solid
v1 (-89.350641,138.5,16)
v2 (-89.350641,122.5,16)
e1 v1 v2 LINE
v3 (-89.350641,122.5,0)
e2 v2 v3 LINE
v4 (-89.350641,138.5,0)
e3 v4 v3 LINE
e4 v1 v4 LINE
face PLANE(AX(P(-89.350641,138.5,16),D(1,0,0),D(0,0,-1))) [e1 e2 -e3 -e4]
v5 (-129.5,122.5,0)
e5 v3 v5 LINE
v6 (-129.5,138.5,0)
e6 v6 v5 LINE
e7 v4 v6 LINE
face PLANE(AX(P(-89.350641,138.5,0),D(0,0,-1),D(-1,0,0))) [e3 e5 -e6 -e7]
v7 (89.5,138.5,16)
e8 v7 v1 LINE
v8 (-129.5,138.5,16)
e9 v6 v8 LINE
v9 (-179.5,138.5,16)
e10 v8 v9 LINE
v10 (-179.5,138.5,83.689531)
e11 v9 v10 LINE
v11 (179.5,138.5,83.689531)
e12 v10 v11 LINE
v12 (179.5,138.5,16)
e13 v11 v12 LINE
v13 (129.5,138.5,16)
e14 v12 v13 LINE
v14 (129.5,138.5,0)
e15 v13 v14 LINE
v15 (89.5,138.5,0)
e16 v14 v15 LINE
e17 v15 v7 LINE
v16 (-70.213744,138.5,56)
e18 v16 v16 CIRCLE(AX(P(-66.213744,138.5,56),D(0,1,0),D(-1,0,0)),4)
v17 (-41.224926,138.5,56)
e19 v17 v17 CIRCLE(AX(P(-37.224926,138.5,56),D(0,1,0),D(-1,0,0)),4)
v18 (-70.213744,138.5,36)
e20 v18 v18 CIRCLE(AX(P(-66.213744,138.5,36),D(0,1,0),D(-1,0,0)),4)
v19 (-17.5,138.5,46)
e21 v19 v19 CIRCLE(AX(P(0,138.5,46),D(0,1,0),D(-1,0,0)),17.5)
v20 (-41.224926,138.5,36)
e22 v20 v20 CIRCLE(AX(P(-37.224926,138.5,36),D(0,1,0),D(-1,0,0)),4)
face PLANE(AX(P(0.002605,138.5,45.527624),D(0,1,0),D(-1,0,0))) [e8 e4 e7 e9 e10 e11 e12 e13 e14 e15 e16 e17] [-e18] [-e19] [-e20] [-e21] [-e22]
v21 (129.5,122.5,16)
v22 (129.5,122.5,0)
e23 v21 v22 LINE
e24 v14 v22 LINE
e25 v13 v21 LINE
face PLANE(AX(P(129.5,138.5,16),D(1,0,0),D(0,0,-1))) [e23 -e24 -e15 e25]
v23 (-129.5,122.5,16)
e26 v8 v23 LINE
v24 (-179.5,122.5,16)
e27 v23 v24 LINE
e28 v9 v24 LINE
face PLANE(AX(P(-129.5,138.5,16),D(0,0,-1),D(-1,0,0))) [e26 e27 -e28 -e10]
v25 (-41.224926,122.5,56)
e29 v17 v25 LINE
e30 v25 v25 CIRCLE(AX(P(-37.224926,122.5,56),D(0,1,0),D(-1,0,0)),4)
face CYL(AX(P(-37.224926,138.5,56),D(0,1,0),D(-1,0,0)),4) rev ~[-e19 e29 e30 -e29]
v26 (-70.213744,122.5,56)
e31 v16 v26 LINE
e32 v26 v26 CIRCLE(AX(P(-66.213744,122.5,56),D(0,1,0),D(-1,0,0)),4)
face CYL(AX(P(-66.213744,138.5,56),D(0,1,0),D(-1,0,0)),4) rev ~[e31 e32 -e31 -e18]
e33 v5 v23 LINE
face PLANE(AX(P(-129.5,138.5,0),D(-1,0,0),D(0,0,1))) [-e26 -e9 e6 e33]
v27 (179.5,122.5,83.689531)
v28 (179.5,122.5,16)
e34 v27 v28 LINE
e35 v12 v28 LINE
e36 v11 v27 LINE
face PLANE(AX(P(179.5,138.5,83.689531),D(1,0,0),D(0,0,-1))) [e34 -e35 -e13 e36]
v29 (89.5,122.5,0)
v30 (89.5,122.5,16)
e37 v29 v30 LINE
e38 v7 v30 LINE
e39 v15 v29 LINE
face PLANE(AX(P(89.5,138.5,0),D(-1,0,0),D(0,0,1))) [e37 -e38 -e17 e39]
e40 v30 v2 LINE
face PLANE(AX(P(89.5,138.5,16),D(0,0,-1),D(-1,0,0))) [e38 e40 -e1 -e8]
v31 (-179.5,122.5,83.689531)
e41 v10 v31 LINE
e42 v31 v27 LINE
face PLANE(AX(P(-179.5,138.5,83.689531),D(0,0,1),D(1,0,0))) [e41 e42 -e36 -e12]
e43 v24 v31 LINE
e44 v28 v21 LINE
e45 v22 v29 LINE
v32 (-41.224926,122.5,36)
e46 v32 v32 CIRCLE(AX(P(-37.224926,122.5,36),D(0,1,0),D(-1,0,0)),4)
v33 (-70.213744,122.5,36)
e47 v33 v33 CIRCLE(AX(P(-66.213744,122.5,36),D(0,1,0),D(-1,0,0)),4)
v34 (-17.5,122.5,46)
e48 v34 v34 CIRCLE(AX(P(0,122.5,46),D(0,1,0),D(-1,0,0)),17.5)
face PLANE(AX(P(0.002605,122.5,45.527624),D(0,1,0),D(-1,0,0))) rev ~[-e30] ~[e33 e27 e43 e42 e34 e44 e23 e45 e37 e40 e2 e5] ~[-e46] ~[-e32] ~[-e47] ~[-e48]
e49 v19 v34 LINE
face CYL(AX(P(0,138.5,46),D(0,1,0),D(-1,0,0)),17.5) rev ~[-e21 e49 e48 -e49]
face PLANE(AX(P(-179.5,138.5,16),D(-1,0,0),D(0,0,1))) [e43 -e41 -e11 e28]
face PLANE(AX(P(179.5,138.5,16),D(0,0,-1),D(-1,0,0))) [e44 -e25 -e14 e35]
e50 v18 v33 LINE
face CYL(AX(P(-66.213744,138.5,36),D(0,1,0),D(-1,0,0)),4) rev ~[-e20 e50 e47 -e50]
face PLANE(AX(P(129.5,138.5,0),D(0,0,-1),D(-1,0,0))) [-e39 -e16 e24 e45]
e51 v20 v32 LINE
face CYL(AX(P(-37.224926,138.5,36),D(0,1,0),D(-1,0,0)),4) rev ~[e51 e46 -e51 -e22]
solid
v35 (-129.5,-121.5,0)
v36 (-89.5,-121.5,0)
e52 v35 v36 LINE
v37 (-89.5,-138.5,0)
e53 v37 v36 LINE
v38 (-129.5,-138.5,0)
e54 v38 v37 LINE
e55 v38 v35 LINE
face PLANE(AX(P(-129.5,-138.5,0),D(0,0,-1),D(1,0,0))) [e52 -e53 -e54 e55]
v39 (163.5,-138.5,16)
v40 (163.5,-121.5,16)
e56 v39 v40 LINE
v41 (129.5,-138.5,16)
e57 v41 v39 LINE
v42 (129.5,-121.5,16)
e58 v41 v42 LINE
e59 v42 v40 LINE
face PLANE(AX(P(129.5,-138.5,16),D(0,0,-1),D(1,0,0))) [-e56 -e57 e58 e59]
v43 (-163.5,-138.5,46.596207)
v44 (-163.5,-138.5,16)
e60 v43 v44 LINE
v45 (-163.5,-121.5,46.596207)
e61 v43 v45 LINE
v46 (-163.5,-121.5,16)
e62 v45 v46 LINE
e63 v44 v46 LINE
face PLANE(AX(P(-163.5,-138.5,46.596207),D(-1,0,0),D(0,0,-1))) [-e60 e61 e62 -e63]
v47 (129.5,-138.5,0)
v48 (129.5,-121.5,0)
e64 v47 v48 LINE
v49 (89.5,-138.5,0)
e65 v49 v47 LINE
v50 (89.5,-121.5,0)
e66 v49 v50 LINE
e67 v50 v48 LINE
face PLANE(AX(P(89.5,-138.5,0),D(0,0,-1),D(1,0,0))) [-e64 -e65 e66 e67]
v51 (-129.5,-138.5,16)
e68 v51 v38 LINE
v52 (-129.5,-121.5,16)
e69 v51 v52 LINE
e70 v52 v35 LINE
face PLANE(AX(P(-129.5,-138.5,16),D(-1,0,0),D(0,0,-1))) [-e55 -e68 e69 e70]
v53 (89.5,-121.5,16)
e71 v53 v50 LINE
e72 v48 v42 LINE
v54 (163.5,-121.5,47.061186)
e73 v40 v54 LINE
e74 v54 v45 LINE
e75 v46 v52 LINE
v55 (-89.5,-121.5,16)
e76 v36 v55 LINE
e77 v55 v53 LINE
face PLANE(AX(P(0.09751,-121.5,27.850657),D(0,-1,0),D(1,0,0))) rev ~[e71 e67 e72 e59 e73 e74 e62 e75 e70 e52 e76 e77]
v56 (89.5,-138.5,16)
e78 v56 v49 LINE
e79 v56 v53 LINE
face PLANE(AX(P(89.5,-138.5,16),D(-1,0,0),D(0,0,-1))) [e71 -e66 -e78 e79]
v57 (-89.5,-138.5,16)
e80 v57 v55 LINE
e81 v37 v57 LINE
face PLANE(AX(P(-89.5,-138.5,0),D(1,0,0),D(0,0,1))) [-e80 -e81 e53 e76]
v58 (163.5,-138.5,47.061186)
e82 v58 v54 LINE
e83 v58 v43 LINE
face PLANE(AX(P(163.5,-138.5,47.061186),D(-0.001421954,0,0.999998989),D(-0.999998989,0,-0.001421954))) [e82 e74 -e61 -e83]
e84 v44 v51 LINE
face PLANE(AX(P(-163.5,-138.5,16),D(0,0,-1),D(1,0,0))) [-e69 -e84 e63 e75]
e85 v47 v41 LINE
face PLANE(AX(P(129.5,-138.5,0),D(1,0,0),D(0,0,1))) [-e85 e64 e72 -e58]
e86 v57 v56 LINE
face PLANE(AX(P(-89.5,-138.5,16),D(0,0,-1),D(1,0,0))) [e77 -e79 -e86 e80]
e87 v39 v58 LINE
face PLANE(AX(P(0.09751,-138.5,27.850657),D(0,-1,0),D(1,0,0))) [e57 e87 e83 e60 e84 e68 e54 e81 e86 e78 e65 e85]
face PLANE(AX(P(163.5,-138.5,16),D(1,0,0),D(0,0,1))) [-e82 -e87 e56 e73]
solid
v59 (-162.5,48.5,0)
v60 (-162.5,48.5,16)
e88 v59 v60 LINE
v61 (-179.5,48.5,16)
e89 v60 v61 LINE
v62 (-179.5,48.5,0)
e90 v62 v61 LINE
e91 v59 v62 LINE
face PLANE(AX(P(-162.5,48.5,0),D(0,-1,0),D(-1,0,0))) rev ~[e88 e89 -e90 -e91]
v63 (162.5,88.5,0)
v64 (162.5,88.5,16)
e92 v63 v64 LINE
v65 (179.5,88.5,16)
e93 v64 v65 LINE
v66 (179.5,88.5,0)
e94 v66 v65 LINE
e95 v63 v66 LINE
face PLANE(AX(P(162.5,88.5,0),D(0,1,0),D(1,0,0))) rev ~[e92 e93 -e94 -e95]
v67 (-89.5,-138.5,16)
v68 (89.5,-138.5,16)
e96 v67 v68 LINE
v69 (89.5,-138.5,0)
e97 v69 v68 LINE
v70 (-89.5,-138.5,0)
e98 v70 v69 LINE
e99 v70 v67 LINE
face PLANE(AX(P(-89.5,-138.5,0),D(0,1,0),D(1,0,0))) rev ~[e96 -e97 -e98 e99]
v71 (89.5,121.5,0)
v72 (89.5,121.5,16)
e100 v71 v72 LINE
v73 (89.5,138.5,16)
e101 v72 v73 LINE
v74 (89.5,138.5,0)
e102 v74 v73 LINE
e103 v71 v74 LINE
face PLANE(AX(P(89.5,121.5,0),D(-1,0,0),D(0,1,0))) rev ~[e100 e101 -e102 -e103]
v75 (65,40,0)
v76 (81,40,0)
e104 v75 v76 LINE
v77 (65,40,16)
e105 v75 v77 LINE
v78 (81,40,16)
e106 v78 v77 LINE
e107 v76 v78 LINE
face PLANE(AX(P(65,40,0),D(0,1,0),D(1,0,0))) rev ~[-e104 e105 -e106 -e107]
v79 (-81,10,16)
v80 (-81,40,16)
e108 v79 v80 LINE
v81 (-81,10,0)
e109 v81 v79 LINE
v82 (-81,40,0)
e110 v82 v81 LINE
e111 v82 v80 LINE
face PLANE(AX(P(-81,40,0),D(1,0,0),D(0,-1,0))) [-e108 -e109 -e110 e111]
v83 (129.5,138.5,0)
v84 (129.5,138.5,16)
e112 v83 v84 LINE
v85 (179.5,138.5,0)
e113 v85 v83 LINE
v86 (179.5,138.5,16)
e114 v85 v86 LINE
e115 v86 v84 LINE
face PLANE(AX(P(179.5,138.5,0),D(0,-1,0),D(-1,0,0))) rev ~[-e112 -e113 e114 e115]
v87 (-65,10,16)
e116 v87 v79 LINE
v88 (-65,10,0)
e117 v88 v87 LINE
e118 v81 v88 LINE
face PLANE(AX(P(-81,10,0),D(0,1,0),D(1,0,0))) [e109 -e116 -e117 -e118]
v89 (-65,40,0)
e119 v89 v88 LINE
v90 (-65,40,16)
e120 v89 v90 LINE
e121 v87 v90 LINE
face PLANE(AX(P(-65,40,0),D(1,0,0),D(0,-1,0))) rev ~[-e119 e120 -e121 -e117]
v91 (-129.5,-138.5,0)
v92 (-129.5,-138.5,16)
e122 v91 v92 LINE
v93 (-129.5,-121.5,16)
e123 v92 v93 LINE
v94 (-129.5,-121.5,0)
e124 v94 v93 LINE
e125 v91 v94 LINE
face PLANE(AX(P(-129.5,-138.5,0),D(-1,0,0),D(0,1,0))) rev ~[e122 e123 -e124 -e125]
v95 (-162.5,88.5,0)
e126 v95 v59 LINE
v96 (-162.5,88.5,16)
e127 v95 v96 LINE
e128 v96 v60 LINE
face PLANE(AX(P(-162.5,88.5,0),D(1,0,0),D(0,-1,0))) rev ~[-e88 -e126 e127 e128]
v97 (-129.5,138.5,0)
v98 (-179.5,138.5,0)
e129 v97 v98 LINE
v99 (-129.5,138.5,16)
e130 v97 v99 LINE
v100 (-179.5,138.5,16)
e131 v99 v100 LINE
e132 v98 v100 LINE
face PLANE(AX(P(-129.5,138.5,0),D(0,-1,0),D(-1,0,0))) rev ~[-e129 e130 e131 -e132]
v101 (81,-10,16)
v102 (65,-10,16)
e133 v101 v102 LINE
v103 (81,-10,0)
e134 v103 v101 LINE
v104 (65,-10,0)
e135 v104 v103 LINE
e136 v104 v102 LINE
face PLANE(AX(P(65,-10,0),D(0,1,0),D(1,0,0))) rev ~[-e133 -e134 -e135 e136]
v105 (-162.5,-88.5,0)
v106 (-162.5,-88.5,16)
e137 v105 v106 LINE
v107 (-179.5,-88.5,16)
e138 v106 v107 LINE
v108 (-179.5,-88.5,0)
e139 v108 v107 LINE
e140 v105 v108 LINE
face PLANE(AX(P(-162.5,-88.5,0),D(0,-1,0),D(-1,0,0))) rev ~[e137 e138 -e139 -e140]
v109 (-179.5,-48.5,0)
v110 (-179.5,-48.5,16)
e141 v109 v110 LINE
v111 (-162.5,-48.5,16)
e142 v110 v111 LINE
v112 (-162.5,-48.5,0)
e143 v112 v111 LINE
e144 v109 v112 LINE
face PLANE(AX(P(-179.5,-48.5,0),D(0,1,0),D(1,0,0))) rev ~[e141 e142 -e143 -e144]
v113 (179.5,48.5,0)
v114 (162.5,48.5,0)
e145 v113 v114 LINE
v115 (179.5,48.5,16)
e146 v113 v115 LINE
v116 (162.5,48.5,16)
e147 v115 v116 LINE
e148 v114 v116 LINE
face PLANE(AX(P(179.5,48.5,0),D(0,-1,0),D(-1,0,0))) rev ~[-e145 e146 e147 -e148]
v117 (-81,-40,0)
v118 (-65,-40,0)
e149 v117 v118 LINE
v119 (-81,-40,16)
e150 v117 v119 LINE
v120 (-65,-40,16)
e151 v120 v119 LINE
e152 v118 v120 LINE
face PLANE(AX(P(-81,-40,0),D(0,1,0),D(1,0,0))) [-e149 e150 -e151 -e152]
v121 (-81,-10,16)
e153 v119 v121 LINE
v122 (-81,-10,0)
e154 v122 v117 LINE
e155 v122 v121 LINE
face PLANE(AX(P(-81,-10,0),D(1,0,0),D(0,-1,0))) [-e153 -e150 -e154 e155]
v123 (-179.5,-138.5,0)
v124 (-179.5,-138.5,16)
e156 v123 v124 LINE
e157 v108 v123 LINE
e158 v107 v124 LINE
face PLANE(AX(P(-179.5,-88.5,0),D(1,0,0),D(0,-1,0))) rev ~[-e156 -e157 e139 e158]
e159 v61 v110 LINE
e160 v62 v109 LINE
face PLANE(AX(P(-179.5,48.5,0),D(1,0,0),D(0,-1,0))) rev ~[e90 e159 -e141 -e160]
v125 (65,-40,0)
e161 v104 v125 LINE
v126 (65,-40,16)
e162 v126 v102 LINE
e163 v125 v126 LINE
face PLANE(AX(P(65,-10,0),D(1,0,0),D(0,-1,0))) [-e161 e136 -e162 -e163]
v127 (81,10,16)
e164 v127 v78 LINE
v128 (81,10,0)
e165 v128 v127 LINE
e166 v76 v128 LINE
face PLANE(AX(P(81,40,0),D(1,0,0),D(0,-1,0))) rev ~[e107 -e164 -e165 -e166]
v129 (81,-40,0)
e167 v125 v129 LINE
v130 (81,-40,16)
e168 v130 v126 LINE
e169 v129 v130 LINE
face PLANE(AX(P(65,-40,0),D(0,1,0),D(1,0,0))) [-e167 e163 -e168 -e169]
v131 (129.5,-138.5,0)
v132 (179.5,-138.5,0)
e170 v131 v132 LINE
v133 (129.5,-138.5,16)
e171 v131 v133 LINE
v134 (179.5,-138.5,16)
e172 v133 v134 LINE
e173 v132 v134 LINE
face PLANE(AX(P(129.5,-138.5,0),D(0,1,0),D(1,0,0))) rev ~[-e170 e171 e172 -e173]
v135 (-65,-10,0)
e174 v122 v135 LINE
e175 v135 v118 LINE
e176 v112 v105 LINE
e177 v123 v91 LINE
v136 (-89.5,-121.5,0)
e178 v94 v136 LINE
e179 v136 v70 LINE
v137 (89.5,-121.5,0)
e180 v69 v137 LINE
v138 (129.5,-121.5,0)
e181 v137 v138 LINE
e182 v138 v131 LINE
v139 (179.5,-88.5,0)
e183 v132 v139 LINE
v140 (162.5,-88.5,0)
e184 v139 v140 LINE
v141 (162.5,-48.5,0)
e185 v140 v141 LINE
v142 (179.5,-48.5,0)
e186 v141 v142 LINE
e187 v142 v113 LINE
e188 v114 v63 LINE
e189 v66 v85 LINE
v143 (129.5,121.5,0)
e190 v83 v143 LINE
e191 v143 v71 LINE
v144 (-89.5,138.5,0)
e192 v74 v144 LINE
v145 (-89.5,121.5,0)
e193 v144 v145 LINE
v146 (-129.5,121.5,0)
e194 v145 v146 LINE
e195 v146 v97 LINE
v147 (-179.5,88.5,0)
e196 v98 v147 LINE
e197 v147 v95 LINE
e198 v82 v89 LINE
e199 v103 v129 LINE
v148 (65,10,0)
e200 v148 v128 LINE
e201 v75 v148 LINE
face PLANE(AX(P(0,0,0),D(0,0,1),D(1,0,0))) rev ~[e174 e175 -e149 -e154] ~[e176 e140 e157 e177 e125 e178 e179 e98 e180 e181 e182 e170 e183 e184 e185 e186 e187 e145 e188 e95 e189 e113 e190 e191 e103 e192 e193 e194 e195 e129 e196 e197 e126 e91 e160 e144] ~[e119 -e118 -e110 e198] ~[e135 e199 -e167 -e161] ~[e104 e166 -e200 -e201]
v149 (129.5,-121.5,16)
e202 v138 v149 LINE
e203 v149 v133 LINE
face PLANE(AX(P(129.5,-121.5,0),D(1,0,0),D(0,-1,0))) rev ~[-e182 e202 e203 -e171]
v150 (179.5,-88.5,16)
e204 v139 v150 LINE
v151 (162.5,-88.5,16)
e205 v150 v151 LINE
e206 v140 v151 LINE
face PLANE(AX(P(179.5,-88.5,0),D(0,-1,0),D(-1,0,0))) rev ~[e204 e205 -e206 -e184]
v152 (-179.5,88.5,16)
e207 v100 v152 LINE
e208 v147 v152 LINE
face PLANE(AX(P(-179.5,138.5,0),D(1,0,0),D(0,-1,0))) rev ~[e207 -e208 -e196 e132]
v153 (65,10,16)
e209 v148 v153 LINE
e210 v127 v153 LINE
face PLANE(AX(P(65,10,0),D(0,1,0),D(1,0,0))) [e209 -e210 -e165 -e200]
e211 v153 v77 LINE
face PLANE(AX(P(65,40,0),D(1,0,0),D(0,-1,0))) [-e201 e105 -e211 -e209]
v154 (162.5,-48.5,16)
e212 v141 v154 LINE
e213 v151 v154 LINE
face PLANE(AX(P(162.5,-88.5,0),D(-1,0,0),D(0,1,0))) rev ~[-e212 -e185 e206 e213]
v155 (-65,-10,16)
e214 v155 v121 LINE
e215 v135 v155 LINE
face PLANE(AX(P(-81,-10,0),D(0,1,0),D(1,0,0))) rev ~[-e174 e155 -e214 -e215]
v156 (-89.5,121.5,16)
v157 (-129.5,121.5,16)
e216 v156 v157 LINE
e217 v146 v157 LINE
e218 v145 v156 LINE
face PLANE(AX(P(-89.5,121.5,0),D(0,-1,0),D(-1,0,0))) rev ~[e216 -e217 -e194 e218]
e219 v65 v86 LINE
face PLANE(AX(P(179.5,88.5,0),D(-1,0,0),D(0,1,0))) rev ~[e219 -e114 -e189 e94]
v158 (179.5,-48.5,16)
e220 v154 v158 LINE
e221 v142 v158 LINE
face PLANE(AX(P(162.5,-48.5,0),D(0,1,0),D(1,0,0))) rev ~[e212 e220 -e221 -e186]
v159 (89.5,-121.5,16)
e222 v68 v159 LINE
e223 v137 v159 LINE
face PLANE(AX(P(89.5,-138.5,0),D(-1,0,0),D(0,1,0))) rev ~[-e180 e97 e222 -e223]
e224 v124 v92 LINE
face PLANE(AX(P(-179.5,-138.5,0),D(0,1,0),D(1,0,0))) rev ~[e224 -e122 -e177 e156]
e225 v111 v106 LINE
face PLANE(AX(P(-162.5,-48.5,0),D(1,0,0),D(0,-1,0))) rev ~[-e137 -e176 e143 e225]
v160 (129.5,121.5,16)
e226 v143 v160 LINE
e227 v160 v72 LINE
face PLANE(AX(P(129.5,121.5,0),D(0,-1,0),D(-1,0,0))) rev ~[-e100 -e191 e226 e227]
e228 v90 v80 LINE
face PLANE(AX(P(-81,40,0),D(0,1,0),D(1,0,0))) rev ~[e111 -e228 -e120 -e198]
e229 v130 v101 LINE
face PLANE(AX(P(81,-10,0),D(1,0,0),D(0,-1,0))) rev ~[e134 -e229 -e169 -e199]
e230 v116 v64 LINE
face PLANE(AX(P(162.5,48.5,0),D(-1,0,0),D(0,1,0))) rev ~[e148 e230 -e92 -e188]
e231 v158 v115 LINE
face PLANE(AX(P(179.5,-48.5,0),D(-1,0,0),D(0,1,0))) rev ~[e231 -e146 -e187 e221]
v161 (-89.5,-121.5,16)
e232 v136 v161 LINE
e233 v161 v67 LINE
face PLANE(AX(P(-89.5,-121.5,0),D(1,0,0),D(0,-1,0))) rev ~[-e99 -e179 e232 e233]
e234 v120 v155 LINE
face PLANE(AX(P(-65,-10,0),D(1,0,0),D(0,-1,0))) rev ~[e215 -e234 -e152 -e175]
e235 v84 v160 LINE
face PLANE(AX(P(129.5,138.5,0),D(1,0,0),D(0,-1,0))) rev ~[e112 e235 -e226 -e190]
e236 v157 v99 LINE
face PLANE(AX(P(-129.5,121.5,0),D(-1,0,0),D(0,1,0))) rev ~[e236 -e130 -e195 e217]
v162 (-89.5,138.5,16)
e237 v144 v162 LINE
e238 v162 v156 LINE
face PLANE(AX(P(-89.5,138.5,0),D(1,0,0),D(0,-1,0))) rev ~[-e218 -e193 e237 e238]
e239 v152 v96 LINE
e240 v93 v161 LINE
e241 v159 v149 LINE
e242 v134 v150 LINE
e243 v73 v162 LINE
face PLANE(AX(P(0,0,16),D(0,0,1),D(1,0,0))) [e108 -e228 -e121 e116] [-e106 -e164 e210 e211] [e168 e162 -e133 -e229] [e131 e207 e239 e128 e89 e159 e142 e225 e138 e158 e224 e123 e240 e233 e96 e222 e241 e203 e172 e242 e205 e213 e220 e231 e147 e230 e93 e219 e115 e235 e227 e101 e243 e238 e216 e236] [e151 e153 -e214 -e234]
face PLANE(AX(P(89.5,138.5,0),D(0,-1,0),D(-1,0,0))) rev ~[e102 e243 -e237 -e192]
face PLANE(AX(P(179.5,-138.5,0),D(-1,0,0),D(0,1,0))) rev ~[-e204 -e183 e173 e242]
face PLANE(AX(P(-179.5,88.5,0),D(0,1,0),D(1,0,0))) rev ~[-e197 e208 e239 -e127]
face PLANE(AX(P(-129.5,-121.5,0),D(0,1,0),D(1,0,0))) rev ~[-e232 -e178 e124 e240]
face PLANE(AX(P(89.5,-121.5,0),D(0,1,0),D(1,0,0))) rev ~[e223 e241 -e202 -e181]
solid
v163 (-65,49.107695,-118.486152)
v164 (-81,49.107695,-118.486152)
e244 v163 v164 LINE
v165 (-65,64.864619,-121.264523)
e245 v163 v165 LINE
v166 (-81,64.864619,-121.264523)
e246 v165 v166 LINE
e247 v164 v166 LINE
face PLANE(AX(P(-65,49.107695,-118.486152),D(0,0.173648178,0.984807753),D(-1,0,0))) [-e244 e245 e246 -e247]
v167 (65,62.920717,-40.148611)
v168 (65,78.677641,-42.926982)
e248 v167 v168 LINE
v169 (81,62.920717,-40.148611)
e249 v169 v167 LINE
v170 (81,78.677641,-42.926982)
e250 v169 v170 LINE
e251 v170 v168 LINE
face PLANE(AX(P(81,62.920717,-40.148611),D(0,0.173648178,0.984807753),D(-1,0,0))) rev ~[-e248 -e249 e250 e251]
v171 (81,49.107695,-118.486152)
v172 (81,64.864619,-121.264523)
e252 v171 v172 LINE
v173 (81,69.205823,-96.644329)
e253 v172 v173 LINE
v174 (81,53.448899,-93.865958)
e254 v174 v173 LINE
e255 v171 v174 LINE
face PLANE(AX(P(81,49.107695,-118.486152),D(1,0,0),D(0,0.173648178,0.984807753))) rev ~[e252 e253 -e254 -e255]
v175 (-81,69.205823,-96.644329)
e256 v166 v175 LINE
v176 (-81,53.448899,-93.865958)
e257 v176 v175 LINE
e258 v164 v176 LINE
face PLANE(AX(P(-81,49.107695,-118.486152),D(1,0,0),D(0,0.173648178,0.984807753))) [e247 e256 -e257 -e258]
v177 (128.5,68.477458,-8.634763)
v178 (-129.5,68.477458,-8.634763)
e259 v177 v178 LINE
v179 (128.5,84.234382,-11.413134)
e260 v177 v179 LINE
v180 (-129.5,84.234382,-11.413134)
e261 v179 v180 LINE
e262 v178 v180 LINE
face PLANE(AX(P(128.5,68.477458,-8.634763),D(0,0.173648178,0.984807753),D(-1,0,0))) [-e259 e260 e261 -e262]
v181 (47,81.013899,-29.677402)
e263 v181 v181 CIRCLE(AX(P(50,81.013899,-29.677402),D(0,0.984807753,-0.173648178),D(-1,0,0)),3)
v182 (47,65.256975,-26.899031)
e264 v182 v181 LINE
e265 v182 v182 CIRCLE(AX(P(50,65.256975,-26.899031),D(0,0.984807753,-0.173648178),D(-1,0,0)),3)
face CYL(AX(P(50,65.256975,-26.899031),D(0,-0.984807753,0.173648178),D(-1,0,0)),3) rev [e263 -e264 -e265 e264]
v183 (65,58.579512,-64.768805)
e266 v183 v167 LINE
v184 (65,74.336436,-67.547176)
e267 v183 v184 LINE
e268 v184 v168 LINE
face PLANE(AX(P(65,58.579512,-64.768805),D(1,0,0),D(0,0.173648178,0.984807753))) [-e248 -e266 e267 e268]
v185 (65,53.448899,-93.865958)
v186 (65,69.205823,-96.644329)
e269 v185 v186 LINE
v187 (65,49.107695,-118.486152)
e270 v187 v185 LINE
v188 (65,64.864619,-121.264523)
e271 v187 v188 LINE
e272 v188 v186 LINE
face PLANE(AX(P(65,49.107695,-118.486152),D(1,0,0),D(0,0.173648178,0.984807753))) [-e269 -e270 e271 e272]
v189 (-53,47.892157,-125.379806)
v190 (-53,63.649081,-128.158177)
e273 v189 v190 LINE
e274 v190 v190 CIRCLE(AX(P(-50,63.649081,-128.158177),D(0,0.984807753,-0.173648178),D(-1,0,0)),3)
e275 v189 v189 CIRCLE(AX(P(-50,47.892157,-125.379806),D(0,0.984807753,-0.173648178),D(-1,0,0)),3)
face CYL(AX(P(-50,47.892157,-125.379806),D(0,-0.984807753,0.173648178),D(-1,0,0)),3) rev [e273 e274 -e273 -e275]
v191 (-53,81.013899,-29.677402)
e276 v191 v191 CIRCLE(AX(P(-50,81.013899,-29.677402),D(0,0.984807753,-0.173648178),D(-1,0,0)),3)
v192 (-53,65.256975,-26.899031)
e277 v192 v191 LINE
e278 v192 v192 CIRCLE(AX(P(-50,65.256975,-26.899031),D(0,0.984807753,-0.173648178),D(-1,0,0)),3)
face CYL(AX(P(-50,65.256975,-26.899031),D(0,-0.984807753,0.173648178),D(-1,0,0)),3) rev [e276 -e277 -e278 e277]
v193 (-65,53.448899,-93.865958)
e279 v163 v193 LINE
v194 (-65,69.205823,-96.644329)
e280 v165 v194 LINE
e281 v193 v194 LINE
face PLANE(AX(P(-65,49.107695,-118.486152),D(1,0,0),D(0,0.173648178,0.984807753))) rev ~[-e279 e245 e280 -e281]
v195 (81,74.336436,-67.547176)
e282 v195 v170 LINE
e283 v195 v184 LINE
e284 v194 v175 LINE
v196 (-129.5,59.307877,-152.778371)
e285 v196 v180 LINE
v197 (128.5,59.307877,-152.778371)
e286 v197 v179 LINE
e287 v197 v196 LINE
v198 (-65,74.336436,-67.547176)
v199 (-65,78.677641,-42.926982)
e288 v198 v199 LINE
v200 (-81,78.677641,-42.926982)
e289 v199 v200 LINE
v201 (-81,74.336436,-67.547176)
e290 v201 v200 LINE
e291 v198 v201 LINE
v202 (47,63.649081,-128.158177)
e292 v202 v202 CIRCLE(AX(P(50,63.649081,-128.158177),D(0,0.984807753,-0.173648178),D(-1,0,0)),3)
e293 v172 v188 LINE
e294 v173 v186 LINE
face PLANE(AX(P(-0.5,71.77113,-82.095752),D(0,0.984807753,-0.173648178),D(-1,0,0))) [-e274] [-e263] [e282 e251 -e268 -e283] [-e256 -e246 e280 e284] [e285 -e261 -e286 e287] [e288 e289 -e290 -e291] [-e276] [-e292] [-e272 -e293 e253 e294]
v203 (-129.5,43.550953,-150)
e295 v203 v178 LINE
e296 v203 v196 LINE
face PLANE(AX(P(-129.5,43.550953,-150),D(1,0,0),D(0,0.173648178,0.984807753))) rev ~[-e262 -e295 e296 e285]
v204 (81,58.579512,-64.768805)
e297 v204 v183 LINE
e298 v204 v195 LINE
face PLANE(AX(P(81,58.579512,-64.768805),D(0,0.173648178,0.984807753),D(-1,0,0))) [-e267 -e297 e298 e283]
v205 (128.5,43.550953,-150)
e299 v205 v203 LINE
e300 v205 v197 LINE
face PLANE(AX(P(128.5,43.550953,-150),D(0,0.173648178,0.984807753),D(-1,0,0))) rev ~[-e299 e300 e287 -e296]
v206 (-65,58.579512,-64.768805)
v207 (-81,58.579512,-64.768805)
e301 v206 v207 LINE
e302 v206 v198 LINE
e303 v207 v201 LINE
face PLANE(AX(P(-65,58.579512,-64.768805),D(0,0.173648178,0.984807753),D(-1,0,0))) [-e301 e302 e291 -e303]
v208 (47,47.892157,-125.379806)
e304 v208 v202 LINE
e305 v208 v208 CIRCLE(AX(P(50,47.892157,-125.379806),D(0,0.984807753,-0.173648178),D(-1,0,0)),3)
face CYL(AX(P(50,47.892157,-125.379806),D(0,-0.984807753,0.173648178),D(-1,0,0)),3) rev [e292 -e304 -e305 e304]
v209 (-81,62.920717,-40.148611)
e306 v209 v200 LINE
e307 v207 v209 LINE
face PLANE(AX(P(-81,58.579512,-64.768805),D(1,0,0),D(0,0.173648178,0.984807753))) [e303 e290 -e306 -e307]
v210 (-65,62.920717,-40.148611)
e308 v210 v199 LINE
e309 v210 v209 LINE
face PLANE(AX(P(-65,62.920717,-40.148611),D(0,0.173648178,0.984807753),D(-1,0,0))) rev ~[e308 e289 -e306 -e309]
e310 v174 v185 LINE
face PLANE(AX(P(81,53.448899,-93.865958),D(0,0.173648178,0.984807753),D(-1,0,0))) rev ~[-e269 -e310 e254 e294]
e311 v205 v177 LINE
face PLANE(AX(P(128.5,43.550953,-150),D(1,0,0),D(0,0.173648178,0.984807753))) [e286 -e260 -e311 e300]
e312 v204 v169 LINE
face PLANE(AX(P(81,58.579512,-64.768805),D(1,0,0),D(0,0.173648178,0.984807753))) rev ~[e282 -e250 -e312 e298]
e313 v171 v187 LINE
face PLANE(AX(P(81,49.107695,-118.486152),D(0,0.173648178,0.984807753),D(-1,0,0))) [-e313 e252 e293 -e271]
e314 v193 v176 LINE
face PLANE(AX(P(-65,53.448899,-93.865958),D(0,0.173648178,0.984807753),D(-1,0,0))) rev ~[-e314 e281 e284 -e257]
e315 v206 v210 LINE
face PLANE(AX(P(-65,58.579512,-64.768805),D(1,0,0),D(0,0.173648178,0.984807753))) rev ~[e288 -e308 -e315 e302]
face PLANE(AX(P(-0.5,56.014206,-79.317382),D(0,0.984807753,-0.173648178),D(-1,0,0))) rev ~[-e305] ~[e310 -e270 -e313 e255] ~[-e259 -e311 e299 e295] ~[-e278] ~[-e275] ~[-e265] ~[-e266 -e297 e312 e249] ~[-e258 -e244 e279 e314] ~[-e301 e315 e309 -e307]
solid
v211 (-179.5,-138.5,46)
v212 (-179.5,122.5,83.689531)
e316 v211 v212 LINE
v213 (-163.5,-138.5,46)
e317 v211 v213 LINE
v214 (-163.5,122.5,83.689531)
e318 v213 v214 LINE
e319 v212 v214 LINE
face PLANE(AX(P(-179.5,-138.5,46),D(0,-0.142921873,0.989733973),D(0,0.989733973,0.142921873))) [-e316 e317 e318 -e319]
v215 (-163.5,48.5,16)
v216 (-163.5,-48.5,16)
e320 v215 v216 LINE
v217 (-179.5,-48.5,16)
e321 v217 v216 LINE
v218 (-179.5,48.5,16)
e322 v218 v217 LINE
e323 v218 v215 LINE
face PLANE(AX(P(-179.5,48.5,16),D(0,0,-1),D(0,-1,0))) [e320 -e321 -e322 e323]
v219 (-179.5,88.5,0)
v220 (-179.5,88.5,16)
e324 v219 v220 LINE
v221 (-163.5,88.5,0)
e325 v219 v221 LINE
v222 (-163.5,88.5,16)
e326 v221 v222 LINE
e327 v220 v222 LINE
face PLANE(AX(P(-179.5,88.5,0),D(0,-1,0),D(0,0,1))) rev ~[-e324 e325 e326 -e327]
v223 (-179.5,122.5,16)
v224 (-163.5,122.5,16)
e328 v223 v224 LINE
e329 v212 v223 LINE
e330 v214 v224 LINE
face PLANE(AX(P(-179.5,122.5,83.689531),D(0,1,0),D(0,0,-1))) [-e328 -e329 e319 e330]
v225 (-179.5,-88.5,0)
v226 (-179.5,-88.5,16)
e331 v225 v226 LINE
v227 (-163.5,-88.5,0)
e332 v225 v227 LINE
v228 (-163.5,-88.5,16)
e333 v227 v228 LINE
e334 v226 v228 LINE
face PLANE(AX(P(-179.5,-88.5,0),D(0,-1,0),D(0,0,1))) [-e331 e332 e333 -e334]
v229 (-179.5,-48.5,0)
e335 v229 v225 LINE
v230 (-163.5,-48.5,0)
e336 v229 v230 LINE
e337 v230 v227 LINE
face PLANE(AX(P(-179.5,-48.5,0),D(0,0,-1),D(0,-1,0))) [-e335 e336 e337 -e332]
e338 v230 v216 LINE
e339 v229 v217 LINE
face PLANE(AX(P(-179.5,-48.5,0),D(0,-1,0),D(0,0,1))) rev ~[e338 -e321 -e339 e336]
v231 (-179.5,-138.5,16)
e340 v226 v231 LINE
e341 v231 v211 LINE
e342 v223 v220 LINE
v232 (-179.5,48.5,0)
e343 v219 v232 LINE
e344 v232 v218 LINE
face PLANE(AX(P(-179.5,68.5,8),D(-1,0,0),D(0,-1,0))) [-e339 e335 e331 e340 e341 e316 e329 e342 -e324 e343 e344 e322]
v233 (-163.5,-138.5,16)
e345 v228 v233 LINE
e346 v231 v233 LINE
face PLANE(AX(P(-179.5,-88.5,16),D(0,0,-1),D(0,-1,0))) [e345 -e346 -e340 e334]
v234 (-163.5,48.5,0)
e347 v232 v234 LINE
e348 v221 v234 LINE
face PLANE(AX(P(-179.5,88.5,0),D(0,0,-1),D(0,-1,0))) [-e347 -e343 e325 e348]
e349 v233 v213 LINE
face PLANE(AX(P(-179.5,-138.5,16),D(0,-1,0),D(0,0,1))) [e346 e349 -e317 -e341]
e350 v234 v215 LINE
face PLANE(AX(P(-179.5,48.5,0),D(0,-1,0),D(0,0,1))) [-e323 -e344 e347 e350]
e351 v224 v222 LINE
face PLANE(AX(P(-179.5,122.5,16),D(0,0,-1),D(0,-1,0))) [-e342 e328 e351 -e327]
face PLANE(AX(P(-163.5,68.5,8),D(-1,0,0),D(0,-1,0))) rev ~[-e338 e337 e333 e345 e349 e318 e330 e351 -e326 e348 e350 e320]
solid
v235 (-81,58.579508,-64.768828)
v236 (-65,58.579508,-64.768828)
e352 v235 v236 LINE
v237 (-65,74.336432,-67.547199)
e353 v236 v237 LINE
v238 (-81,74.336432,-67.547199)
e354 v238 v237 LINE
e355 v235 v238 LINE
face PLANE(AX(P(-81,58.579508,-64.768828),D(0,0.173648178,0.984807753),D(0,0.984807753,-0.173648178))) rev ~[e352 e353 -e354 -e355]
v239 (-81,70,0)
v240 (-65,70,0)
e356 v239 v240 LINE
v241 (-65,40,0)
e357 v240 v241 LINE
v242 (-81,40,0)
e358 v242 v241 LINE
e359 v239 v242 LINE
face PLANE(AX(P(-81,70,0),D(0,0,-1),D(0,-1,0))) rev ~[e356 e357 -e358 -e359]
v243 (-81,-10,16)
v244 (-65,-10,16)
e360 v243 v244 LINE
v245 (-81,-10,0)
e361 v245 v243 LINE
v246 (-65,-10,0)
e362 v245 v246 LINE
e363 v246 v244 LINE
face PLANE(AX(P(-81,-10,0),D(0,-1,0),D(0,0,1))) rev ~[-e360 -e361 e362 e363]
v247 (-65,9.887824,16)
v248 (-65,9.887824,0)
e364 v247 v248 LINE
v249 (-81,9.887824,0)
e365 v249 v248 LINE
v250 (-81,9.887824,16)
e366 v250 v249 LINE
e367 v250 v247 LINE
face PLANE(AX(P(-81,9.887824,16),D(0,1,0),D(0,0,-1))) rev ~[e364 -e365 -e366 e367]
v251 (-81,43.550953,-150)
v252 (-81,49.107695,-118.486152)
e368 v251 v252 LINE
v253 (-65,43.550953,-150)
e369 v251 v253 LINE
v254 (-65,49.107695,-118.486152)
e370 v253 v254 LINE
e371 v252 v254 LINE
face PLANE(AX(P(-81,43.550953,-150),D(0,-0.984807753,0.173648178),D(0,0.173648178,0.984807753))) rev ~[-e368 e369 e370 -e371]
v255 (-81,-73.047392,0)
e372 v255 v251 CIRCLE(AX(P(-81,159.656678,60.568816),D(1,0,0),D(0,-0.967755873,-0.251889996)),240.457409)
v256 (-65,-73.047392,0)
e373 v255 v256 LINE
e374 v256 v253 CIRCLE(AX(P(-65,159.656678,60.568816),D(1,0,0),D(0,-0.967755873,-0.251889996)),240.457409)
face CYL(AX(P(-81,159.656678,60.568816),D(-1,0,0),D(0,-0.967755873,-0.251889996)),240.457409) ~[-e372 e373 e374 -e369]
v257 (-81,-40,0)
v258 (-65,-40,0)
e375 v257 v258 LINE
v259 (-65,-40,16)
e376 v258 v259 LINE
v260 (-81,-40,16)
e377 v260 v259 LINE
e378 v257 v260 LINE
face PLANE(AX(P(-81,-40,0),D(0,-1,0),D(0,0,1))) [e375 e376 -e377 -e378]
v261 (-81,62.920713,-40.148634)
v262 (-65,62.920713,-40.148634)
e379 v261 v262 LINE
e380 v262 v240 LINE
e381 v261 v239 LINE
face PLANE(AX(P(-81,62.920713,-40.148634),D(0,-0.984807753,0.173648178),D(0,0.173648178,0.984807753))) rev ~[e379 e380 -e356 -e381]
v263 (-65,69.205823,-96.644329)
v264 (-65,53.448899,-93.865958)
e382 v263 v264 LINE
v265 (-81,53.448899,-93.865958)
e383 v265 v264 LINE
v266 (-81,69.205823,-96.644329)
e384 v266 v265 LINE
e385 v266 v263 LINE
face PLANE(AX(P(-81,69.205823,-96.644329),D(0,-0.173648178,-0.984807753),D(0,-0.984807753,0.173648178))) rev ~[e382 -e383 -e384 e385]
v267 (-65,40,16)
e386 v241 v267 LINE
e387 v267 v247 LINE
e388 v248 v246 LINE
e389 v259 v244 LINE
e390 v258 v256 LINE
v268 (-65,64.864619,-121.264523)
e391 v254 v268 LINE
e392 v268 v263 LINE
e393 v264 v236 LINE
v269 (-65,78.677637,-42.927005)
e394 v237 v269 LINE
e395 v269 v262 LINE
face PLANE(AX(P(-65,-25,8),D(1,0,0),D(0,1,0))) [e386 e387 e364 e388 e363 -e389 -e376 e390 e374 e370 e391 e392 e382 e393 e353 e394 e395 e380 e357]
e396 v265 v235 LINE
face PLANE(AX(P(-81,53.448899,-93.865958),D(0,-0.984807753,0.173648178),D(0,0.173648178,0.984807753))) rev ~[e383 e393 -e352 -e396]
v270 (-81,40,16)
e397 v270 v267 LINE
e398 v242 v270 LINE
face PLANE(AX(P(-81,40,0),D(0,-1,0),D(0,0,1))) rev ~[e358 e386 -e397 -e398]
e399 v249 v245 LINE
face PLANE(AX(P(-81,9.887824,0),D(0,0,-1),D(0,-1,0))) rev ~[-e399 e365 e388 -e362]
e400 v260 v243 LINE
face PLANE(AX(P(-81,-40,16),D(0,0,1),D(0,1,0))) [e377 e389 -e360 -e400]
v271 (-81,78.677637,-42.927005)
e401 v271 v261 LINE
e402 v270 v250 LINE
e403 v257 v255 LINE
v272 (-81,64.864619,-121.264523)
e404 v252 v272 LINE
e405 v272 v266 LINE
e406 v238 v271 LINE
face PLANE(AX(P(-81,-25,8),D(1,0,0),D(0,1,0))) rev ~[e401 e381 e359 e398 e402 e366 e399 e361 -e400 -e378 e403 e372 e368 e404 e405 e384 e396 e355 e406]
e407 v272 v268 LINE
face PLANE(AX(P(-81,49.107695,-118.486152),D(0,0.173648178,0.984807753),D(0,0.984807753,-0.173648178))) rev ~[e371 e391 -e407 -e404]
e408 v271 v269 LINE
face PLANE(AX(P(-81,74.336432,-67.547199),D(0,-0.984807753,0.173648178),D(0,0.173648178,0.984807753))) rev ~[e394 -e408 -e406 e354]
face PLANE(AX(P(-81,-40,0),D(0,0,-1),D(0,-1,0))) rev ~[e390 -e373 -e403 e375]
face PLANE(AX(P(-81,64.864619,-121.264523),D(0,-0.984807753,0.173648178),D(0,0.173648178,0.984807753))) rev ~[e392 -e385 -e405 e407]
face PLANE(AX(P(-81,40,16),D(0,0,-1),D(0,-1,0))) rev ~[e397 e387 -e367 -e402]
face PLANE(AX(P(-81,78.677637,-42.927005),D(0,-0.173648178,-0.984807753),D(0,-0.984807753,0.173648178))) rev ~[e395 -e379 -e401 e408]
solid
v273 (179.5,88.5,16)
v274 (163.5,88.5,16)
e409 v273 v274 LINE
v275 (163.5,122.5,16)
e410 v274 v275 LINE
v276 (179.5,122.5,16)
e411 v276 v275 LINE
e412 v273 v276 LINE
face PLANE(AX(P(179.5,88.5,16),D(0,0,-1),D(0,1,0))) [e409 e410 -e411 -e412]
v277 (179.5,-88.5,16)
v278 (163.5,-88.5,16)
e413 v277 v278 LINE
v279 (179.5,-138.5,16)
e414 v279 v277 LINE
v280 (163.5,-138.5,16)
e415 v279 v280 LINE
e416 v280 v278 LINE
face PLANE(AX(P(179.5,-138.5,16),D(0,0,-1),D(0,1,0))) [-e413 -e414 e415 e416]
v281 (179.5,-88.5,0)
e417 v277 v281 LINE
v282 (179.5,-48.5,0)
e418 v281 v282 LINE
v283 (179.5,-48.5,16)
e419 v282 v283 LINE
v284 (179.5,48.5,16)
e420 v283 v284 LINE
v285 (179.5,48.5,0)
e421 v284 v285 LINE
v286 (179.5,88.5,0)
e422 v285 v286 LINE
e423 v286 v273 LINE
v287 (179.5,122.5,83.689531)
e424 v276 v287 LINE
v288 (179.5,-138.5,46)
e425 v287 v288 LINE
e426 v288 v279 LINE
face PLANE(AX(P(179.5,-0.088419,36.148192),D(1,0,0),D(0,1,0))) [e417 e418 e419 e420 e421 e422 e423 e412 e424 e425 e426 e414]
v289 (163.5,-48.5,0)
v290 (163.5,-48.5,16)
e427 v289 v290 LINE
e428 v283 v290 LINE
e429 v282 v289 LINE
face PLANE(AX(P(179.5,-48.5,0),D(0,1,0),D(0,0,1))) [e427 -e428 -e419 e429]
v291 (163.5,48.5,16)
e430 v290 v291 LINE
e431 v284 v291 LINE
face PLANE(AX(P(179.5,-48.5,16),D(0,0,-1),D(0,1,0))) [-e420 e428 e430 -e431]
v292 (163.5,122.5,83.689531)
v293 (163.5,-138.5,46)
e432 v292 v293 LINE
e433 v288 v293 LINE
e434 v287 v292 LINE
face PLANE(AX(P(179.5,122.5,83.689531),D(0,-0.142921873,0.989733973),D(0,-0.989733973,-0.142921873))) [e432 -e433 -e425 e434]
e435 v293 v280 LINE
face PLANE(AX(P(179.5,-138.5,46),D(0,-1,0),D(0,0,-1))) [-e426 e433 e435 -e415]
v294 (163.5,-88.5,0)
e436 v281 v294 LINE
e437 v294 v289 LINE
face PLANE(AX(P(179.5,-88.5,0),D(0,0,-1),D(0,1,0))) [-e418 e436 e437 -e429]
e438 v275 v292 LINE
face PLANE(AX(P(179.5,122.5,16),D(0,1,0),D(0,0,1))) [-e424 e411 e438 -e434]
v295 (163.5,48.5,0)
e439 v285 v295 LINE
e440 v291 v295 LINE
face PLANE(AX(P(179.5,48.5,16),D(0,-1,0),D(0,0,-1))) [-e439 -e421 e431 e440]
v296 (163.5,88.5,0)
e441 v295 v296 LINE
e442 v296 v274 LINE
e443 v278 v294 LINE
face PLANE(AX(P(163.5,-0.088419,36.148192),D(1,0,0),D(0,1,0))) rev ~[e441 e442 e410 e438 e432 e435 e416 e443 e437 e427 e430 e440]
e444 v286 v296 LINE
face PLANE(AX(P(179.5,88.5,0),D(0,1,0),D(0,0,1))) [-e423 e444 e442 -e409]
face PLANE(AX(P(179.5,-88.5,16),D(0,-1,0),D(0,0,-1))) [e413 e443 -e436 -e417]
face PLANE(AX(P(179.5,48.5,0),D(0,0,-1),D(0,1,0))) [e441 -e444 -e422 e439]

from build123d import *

# Parameters (mm, degrees)
F1_DEPTH  = 16
F2_W      = 40
F2_H      = 16
F3_DEPTH  = 16
F5_DEPTH  = 16
F7_DEPTH  = 16
F9_DEPTH  = 17
F10_R     = 17.5
F10_R_2   = 4
F11_DEPTH = 25
F12_W     = 16
F12_H     = 30
F13_DEPTH = 25
F14_W     = 30
F14_H     = 16
F15_DEPTH = 16
F16_W     = 258
F16_H     = 143.5460233889
F16_R     = 3
F16_W_2   = 16
F16_H_2   = 25
F17_DEPTH = 16


with BuildPart() as f1:
    # F0 (on Top) → F1 (new body)
    with BuildSketch(Plane.XY):
        Polygon((129.5, -138.5), (179.5, -138.5), (179.5, -88.5), (162.5, -88.5), (162.5, -48.5), (179.5, -48.5), (179.5, 48.5), (162.5, 48.5), (162.5, 88.5), (179.5, 88.5), (179.5, 138.5), (129.5, 138.5), (129.5, 121.5), (89.5, 121.5), (89.5, 138.5), (-89.5, 138.5), (-89.5, 121.5), (-129.5, 121.5), (-129.5, 138.5), (-179.5, 138.5), (-179.5, 88.5), (-162.5, 88.5), (-162.5, 48.5), (-179.5, 48.5), (-179.5, -48.5), (-162.5, -48.5), (-162.5, -88.5), (-179.5, -88.5), (-179.5, -138.5), (-129.5, -138.5), (-129.5, -121.5), (-89.5, -121.5), (-89.5, -138.5), (89.5, -138.5), (89.5, -121.5), (129.5, -121.5), align=None)
    extrude(amount=F1_DEPTH)

    # F12 (on face) → F13 (cut)
    with BuildSketch(Plane(origin=(0, 0, 0), x_dir=(1, 0, 0), z_dir=(0, 0, -1))):
        with Locations((73, -25)):
            Rectangle(F12_W, F12_H)
        with Locations((73, 25)):
            Rectangle(F12_W, F12_H)
        with Locations((-73, -25)):
            Rectangle(F12_W, F12_H)
        with Locations((-73, 25)):
            Rectangle(F12_W, F12_H)
    extrude(amount=-F13_DEPTH, mode=Mode.SUBTRACT)


with BuildPart() as f3:
    # F2 (on face) → F3 (new body)
    with BuildSketch(Plane(origin=(-179.5, 0, 0), x_dir=(0, -1, 0), z_dir=(-1, 0, 0))):
        with Locations((-68.5, 8)):
            Rectangle(F2_W, F2_H)
        with Locations((68.5, 8)):
            Rectangle(F2_W, F2_H)
        Polygon((-122.5, 16), (-88.5, 16), (-48.5, 16), (48.5, 16), (88.5, 16), (138.5, 16), (138.5, 46), (-122.5, 83.6895306859), align=None)
    extrude(amount=-F3_DEPTH)


with BuildPart() as f5:
    # F4 (on face) → F5 (new body)
    with BuildSketch(Plane(origin=(0, 138.5, 0), x_dir=(-1, 0, 0), z_dir=(0, 1, 0))):
        Polygon((129.5, 16), (179.5, 16), (179.5, 83.6895306859), (-179.5, 83.6895306859), (-179.5, 16), (-129.5, 16), (-129.5, 0), (-89.5, 0), (-89.5, 16), (89.3506407738, 16), (89.3506407738, 0), (129.5, 0), align=None)
    extrude(amount=-F5_DEPTH)

    # F10 (on face) → F11 (cut)
    with BuildSketch(Plane(origin=(0, 138.5, 0), x_dir=(-1, 0, 0), z_dir=(0, 1, 0))):
        with Locations((0, 46)):
            Circle(F10_R)
        with Locations((37.2249260545, 56)):
            Circle(F10_R_2)
        with Locations((66.2137439211, 56)):
            Circle(F10_R_2)
        with Locations((66.2137439211, 36)):
            Circle(F10_R_2)
        with Locations((37.2249260545, 36)):
            Circle(F10_R_2)
    extrude(amount=-F11_DEPTH, mode=Mode.SUBTRACT)


with BuildPart() as f7:
    # F6 (on face) → F7 (new body)
    with BuildSketch(Plane.YZ.offset(179.5)):
        Polygon((-138.5, 46), (-138.5, 16), (-88.5, 16), (-88.5, 0), (-48.5, 0), (-48.5, 16), (48.5, 16), (48.5, 0), (88.5, 0), (88.5, 16), (122.5, 16), (122.5, 83.6895306859), align=None)
    extrude(amount=-F7_DEPTH)


with BuildPart() as f9:
    # F8 (on face) → F9 (new body)
    with BuildSketch(Plane.XZ.offset(138.5)):
        Polygon((163.5, 47.0611862838), (-163.5, 46.5962067246), (-163.5, 16), (-129.5, 16), (-129.5, 0), (-89.5, 0), (-89.5, 16), (89.5, 16), (89.5, 0), (129.5, 0), (129.5, 16), (163.5, 16), align=None)
    extrude(amount=-F9_DEPTH)


with BuildPart() as f15:
    # F14 (on face) → F15 (new body)
    with BuildSketch(Plane.YZ.offset(-81)):
        with Locations((-25, 8)):
            Rectangle(F14_W, F14_H)
        Polygon((53.4488990207, -93.8659580783), (49.1076945791, -118.4861519036), (64.8646186273, -121.2645227463), (69.2058230689, -96.644328921), align=None)
        Polygon((62.9207125198, -40.1486343825), (58.5795080781, -64.7688282078), (74.3364321263, -67.5471990505), (78.677636568, -42.9270052252), align=None)
        with BuildLine():
            Line((-10, 0), (-40, 0))
            Line((-40, 0), (-73.0473920703, 0))
            ThreePointArc((-73.0473920703, 0), (-30.1908089692, -87.0038690918), (43.5509528937, -150))
            Line((43.5509528937, -150), (49.1076945791, -118.4861519036))
            Line((49.1076945791, -118.4861519036), (53.4488990207, -93.8659580783))
            Line((53.4488990207, -93.8659580783), (58.5795080781, -64.7688282078))
            Line((58.5795080781, -64.7688282078), (62.9207125198, -40.1486343825))
            Line((62.9207125198, -40.1486343825), (70, 0))
            Line((70, 0), (40, 0))
            Line((40, 0), (40, 16))
            Line((40, 16), (9.887823835, 16))
            Line((9.887823835, 16), (9.887823835, 0))
            Line((9.887823835, 0), (-10, 0))
        make_face()
    extrude(amount=F15_DEPTH)


with BuildPart() as f17:
    # F16 (on face) → F17 (new body)
    with BuildSketch(Plane(origin=(0, 67.8892417275, -11.9707050164), x_dir=(-1, 0, 0), z_dir=(0, 0.984807753, -0.1736481777))):
        with Locations((0.5, -68.3856076517)):
            Rectangle(F16_W, F16_H)
        with Locations((-50, -115.1586193462)):
            Circle(F16_R, mode=Mode.SUBTRACT)
        with Locations((-73, -95.6586193462)):
            Rectangle(F16_W_2, F16_H_2, mode=Mode.SUBTRACT)
        with Locations((50, -115.1586193462)):
            Circle(F16_R, mode=Mode.SUBTRACT)
        with Locations((73, -95.6586193462)):
            Rectangle(F16_W_2, F16_H_2, mode=Mode.SUBTRACT)
        with Locations((-73, -41.1125959573)):
            Rectangle(F16_W_2, F16_H_2, mode=Mode.SUBTRACT)
        with Locations((-50, -15.1586193462)):
            Circle(F16_R, mode=Mode.SUBTRACT)
        with Locations((73, -41.1125959573)):
            Rectangle(F16_W_2, F16_H_2, mode=Mode.SUBTRACT)
        with Locations((50, -15.1586193462)):
            Circle(F16_R, mode=Mode.SUBTRACT)
    extrude(amount=F17_DEPTH)


solid = Compound([f1.part, f3.part, f5.part, f7.part, f9.part, f15.part, f17.part])
